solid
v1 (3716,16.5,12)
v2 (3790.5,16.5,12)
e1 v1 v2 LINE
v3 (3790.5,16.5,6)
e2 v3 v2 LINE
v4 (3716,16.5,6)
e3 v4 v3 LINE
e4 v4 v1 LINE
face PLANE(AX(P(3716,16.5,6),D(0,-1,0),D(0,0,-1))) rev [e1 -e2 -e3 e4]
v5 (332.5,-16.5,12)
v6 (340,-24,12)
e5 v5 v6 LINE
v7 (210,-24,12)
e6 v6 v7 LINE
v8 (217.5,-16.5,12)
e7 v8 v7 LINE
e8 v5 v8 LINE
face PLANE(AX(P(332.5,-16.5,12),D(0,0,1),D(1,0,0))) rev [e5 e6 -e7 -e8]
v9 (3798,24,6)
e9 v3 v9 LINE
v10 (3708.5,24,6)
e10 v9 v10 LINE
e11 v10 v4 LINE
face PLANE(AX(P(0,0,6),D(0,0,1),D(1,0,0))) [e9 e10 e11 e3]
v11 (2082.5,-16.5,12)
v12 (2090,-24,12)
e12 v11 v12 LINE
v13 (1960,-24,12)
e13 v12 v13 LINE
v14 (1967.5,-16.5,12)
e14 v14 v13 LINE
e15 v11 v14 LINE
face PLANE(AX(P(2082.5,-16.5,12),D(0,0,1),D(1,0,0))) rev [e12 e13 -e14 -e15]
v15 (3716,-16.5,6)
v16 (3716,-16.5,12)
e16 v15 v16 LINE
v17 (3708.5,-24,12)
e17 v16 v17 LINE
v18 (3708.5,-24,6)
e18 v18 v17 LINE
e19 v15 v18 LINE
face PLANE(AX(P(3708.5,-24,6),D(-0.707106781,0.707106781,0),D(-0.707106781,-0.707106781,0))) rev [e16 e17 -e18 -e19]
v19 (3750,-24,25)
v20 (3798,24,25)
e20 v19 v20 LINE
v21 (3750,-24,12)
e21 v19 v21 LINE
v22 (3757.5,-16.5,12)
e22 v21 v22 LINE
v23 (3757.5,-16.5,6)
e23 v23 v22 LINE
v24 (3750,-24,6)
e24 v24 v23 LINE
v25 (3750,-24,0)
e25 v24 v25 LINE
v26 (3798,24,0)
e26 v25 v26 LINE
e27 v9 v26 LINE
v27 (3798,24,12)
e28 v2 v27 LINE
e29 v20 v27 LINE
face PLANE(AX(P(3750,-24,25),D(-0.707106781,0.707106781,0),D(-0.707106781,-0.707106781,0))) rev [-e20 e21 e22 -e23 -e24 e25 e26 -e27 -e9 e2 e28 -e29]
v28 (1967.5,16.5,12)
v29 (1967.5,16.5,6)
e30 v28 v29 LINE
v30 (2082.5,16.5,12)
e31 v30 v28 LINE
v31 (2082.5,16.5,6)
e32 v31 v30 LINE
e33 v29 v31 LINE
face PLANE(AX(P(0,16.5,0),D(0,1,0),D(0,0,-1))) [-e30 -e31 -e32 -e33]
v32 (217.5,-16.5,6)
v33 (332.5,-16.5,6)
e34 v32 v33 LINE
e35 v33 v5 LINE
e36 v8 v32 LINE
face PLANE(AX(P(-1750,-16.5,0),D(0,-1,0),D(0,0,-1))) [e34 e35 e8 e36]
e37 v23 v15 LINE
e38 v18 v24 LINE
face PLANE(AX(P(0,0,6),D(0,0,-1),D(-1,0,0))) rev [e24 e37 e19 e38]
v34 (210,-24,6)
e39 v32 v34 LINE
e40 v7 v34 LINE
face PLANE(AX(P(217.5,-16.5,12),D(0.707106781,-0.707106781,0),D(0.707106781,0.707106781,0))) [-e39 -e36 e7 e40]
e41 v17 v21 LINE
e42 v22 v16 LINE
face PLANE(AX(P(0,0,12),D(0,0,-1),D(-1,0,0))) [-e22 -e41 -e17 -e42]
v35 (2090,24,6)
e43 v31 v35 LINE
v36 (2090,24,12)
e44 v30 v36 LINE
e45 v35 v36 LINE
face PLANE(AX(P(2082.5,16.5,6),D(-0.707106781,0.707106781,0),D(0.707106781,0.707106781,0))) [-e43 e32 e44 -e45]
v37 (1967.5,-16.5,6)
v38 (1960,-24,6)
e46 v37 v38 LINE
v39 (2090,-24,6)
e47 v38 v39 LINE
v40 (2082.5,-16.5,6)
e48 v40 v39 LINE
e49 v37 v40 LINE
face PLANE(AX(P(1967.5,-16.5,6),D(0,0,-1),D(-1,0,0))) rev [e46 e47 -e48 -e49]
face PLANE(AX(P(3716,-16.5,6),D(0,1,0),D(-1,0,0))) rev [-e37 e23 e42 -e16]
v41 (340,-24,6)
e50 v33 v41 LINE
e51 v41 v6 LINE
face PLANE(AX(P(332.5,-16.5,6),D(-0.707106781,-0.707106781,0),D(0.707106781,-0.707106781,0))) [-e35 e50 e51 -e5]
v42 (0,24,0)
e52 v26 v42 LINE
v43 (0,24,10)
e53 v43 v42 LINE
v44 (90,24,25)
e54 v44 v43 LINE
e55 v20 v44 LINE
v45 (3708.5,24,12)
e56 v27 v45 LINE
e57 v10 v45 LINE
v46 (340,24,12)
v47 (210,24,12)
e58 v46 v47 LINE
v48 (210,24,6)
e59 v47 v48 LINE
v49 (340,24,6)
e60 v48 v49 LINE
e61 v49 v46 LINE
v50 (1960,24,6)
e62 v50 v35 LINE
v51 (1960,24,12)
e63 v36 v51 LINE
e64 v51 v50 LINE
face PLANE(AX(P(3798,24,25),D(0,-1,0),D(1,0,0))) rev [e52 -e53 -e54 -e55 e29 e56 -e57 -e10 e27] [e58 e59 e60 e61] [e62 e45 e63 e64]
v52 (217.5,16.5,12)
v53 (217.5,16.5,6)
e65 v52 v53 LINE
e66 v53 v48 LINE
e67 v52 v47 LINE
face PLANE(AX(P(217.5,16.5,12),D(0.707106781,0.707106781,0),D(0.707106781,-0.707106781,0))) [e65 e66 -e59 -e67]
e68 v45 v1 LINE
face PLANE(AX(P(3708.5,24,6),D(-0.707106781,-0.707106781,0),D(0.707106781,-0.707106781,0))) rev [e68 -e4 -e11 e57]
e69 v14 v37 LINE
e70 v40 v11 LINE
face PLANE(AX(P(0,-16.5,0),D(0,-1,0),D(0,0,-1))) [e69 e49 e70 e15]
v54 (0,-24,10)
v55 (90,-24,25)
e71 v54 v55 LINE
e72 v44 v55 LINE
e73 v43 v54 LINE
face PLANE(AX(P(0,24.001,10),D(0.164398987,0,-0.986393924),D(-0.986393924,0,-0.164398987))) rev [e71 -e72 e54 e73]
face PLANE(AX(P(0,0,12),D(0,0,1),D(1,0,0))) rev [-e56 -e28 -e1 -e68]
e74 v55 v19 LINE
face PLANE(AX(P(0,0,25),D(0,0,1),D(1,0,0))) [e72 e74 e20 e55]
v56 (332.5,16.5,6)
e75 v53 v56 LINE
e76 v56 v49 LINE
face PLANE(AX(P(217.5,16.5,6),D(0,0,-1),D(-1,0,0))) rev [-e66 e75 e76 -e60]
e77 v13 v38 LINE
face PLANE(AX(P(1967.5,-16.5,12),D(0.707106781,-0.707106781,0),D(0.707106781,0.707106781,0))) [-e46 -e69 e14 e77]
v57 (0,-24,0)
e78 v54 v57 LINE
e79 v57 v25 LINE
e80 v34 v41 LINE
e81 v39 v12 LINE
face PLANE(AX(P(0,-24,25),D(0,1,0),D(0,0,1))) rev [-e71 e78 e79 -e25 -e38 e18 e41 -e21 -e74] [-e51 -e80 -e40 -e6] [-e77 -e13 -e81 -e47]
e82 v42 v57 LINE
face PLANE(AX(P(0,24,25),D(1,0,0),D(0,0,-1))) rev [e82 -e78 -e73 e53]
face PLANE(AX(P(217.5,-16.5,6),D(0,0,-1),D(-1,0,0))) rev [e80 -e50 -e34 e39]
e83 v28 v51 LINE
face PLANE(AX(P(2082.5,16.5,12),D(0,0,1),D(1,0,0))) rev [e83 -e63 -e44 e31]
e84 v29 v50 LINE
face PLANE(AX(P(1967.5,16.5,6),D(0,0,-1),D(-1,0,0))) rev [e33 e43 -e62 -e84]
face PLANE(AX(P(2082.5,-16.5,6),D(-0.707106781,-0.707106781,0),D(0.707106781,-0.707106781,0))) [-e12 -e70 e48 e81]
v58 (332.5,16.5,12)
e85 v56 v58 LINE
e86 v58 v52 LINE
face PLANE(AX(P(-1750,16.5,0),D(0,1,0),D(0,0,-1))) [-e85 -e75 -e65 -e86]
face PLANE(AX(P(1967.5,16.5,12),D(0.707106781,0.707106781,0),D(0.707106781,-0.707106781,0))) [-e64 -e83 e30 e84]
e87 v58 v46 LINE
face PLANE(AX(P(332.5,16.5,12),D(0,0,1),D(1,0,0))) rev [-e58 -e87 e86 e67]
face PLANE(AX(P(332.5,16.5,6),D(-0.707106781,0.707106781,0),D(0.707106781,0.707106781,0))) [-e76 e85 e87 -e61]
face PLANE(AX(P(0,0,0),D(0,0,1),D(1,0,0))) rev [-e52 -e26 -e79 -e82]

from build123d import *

# Parameters (mm, degrees)
EXTRUDE_1_DEPTH        = 25
SKETCH_2_W             = 115
SKETCH_2_H             = 6
CUT_EXTRUDE_1_DEPTH    = 7.5
DRAFT_1_ANGLE          = 45
MIRROR_START           = 6
MIRROR_1_DEPTH         = 6
PATTERN_START          = 6
PATTERN_LINEAR_1_DEPTH = 6
CUT_EXTRUDE_START      = -13
CUT_EXTRUDE_3_DEPTH    = 6
CUT_EXTRUDE_4_REACH    = 3800.386


# Read off the part's stored shape, not the designer's step: 镜向1, 阵列(线性)1
with BuildPart() as part:
    # 草图1 → 凸台-拉伸1 (new body)
    with BuildSketch(Plane.XY):
        Polygon((0, 24), (0, -24), (3750, -24), (3798, 24), align=None)
    extrude(amount=EXTRUDE_1_DEPTH)

    # 草图2 → 切除-拉伸1 (cut)
    with BuildSketch(Plane.XZ.offset(24)):
        with Locations((2025, 9)):
            Rectangle(SKETCH_2_W, SKETCH_2_H)
    extrude(amount=-CUT_EXTRUDE_1_DEPTH, mode=Mode.SUBTRACT)

    # 拔模1
    draft_1_faces = [part.faces().sort_by_distance(p)[0] for p in [
        (2082.5, -20.25, 9),
        (1967.5, -20.25, 9),
    ]]
    draft(draft_1_faces, Plane(origin=(0, -16.5, 0), x_dir=(0, 0, -1), z_dir=(0, -1, 0)), DRAFT_1_ANGLE)

    # 镜向1 outline → 镜向1 (cut)
    with BuildSketch(Plane.XY.offset(MIRROR_START)):
        Polygon((2082.5, 16.5), (2090, 24), (1960, 24), (1967.5, 16.5), align=None)
    extrude(amount=MIRROR_1_DEPTH, mode=Mode.SUBTRACT)

    # 阵列(线性)1 outline → 阵列(线性)1 (cut)
    with BuildSketch(Plane.XY.offset(PATTERN_START)):
        Polygon((332.5, 16.5), (340, 24), (210, 24), (217.5, 16.5), align=None)
        Polygon((340, -24), (332.5, -16.5), (217.5, -16.5), (210, -24), align=None)
    extrude(amount=PATTERN_LINEAR_1_DEPTH, mode=Mode.SUBTRACT)

    # 草图4 → 切除-拉伸3 (cut)
    with BuildSketch(Plane.XY.offset(25).offset(CUT_EXTRUDE_START)):
        Polygon((3708.5, 24), (3716, 16.5), (3790.5, 16.5), (3798, 24), align=None)
        Polygon((3708.5, -24), (3716, -16.5), (3757.5, -16.5), (3750, -24), align=None)
    extrude(amount=-CUT_EXTRUDE_3_DEPTH, mode=Mode.SUBTRACT)

    # 草图5 → 切除-拉伸4 (cut, up to next)
    with BuildSketch(Plane.XZ.offset(24), mode=Mode.PRIVATE) as cut_extrude_4_sk1:
        Polygon((0, 10), (90, 25), (0, 25), align=None)
    cut_extrude_4_tool1 = extrude(cut_extrude_4_sk1.sketch, amount=-CUT_EXTRUDE_4_REACH, mode=Mode.PRIVATE) & part.part
    add(cut_extrude_4_tool1.solids().sort_by_distance((30, -24, 20))[0], mode=Mode.SUBTRACT)


solid = part.part
